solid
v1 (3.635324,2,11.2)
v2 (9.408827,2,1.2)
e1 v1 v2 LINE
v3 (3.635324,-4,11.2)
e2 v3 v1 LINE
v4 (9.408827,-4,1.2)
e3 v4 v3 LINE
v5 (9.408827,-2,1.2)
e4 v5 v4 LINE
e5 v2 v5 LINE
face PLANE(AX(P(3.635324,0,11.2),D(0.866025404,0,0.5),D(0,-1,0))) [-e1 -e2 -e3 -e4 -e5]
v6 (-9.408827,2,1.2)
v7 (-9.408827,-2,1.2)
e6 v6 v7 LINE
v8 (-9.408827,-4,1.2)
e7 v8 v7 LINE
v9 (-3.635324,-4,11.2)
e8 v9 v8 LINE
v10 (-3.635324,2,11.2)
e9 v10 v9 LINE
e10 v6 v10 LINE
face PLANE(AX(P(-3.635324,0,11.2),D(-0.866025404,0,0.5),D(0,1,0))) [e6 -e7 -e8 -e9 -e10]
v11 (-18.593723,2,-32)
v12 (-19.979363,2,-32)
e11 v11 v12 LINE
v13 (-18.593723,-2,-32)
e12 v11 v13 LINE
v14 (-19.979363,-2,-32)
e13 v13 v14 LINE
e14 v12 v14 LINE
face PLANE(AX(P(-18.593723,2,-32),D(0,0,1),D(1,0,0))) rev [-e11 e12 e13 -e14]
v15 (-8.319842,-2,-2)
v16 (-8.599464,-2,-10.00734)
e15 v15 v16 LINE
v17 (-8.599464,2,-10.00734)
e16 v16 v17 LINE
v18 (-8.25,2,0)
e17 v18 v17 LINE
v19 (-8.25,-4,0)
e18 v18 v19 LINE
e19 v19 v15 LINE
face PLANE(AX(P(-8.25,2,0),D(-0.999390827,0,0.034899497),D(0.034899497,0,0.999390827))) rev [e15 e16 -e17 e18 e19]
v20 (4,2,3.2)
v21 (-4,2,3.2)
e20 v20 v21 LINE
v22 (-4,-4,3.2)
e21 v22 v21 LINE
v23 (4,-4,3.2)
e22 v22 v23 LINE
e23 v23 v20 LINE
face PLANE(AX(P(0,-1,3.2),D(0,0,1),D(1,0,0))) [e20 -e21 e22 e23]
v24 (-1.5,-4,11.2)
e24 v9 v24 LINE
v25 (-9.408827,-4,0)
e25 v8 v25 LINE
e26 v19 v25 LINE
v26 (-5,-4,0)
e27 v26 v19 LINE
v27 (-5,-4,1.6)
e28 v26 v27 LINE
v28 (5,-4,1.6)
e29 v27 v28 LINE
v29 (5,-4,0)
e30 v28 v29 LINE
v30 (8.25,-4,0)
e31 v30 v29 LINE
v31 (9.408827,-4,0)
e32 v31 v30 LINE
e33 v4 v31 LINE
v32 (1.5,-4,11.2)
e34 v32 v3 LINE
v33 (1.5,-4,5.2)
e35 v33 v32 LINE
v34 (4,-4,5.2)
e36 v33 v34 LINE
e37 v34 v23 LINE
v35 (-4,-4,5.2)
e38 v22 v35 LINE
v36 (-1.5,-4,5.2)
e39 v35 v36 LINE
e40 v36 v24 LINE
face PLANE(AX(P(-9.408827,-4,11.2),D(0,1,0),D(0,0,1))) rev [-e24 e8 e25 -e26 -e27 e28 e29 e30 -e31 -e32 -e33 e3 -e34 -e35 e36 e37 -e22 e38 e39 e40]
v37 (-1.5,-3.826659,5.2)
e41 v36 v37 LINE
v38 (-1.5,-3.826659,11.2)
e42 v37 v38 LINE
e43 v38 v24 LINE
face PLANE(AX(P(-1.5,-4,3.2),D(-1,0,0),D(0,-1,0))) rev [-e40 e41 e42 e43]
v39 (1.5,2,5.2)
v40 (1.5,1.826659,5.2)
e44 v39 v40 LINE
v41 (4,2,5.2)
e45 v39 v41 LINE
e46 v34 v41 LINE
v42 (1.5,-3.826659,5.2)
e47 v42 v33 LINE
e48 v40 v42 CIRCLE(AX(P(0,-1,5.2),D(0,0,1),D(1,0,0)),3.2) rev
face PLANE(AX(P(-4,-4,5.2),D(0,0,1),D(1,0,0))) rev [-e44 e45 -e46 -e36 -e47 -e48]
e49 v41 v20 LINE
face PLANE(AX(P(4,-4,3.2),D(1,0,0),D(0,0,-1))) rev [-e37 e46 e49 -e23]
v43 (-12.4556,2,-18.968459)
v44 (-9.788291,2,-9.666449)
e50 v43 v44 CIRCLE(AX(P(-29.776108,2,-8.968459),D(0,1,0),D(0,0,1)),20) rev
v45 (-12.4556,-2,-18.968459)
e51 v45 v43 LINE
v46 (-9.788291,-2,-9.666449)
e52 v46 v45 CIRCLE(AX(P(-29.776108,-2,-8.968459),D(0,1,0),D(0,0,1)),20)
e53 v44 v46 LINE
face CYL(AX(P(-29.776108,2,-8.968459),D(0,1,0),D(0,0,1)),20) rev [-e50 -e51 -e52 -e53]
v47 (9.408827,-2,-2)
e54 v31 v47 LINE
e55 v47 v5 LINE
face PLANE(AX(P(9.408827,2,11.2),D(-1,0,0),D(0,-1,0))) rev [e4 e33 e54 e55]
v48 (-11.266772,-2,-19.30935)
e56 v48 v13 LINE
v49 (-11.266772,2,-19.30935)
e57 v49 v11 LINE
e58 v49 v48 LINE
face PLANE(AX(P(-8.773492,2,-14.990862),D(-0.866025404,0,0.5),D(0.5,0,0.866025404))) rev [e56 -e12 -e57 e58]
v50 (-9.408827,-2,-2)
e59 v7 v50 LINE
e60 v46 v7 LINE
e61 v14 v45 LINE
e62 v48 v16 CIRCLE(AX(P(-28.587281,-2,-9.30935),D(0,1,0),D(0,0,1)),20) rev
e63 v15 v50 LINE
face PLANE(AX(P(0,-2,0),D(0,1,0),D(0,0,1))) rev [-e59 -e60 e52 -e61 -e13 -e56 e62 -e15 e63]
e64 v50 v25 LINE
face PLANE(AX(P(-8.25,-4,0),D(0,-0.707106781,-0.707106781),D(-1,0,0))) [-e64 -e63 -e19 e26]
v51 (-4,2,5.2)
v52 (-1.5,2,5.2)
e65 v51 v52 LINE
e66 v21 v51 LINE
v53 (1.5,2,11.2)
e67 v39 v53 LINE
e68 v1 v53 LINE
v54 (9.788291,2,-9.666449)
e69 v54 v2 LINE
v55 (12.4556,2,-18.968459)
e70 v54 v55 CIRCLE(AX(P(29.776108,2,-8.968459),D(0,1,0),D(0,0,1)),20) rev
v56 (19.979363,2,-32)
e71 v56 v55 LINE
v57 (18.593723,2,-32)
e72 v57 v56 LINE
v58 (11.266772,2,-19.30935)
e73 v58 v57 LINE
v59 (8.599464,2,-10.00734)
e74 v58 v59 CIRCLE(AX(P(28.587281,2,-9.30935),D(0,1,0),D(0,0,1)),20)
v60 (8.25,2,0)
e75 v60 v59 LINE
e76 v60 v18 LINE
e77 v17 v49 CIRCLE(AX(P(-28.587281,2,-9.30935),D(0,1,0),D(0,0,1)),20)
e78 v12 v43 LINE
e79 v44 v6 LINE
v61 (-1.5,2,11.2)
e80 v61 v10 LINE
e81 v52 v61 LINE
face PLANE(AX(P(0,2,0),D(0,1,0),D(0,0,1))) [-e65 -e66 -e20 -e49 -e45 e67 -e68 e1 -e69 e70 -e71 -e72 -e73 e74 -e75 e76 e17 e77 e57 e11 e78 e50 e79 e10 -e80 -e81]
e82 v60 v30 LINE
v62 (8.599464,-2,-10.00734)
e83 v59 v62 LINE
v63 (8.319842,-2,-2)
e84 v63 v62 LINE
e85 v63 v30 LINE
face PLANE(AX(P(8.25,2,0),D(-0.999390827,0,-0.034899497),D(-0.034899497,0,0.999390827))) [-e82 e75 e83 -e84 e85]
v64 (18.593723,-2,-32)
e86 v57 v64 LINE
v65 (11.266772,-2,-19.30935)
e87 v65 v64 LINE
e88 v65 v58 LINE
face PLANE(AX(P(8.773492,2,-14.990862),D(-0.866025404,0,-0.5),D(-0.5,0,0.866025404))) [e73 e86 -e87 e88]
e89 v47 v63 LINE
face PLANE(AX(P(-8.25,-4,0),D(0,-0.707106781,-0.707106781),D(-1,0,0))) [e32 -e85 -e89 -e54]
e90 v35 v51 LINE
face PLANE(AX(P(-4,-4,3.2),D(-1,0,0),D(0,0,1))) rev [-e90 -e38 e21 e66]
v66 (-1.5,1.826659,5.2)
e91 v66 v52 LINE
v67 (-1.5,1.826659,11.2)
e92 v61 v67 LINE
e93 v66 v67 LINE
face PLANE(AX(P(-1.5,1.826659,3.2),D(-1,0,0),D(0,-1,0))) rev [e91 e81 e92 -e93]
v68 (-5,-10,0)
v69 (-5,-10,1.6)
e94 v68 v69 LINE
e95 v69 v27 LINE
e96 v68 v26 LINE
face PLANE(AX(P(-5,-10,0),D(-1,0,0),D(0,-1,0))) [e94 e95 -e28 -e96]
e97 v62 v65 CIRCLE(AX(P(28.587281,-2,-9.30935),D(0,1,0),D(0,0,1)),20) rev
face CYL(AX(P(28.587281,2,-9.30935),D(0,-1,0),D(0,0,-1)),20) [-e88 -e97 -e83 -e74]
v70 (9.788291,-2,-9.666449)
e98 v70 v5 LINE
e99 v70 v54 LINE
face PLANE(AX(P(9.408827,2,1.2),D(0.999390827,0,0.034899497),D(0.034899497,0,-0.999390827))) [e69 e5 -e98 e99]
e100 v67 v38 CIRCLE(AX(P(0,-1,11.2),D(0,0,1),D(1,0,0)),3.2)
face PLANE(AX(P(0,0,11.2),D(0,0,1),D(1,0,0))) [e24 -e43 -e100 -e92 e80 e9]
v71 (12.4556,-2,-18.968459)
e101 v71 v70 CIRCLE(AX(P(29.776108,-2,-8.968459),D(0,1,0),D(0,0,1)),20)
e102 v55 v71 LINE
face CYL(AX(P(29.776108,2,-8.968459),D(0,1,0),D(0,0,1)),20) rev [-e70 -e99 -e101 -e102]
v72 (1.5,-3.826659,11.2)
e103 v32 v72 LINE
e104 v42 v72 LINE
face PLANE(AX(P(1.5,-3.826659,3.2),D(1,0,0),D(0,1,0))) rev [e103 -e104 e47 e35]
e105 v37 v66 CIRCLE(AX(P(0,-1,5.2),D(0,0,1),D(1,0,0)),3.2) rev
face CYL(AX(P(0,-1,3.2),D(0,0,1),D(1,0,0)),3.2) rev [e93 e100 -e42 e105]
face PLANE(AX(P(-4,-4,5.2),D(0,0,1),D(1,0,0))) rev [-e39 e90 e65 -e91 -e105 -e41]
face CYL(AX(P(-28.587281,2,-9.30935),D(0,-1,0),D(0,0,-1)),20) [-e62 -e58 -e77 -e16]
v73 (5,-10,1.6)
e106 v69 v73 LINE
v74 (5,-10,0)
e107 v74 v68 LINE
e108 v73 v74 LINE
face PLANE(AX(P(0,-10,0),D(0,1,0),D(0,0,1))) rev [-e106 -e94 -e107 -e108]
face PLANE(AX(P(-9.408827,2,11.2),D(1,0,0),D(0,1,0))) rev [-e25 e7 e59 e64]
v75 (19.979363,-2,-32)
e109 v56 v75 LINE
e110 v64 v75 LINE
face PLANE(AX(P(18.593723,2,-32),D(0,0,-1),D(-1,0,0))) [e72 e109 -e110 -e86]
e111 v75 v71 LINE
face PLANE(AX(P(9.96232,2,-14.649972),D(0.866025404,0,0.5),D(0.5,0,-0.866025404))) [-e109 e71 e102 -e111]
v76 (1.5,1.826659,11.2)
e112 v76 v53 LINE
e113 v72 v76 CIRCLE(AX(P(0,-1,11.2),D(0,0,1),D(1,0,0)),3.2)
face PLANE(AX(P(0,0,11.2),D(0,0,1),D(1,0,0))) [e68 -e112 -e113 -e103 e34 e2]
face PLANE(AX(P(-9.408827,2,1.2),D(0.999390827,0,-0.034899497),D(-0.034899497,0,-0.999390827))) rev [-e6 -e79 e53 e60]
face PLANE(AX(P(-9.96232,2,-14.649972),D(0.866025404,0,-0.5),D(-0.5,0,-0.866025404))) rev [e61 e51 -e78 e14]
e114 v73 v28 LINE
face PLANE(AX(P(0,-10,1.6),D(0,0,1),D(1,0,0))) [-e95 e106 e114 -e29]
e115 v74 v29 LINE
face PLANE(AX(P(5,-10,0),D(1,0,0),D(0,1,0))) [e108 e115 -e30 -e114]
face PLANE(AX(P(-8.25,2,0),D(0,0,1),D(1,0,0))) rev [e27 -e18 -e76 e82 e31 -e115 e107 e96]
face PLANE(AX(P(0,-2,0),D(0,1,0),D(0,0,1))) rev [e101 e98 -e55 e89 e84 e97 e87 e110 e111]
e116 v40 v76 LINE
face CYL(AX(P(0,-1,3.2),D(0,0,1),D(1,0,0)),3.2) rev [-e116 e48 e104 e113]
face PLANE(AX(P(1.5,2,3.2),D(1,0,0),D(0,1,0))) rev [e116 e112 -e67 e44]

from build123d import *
from OCP.BRepFilletAPI import BRepFilletAPI_MakeChamfer

# Parameters (mm, degrees)
BOSS_EXTRUDE1_DEPTH             = 2
BOSS_EXTRUDE2_REACH             = 40.8
SKETCH2_W                       = 18.81765306
SKETCH2_H                       = 6
BOSS_EXTRUDE2_DIRECTION_2_DEPTH = 10
CUT_EXTRUDE1_DEPTH              = 8
CUT_EXTRUDE2_DEPTH              = 38.936459462
CUT_EXTRUDE2_DEPTH_BACK         = 38.936459462
SKETCH4_W                       = 8
SKETCH4_H                       = 2
CHAMFER1_SIZE                   = 2
CHAMFER2_SIZE                   = 10
CHAMFER2_SIZE2                  = 5.773502692
FILLET1_R                       = 20
BOSS_EXTRUDE3_START             = -6
SKETCH5_W                       = 10
SKETCH5_H                       = 1.6
BOSS_EXTRUDE3_DEPTH             = 12


with BuildPart() as part:
    # Sketch1 → Boss-Extrude1 (new, symmetric)
    with BuildSketch(Plane(origin=(0, 0, 0), x_dir=(1, 0, 0), z_dir=(0, 1, 0))):
        Polygon((-8.25, 0), (0, 0), (0, -1.2), (-9.40882653, -1.2), (-9.962319737, 14.649971666), (-19.979363266, 32), (-18.59372262, 32), (-8.773492451, 14.990862405), align=None)
    boss_extrude1 = extrude(amount=BOSS_EXTRUDE1_DEPTH, both=True)

    # Mirror1: Boss-Extrude1 across plane
    add(boss_extrude1.mirror(Plane(origin=(0, 2, 0), x_dir=(0, 0, 1), z_dir=(-1, 0, 0))))

    # Boss-Extrude2: up to this face of the body (flat: up to its plane)
    boss_extrude2_end = Plane(part.part.faces().sort_by_distance((0, 0, 0))[0])
    # Sketch2 → Boss-Extrude2 (add, up to the picked face)
    with BuildSketch(Plane.XY.offset(1.2), mode=Mode.PRIVATE) as boss_extrude2_sk1:
        with Locations((0, -1)):
            Rectangle(SKETCH2_W, SKETCH2_H)
    boss_extrude2_tool1 = split(extrude(boss_extrude2_sk1.sketch, amount=-BOSS_EXTRUDE2_REACH, mode=Mode.PRIVATE), bisect_by=boss_extrude2_end, keep=Keep.BOTH, mode=Mode.PRIVATE)
    add(boss_extrude2_tool1.solids().sort_by(Axis((0, -1, 1.2), (0, 0, -1)))[0])

    # Sketch2 → Boss-Extrude2 direction 2 (add)
    with BuildSketch(Plane.XY.offset(1.2)):
        with Locations((0, -1)):
            Rectangle(SKETCH2_W, SKETCH2_H)
    extrude(amount=BOSS_EXTRUDE2_DIRECTION_2_DEPTH)

    # Sketch3 → Cut-Extrude1 (cut)
    with BuildSketch(Plane.XY.offset(11.2)):
        with BuildLine():
            Line((-1.5, 1.826658805), (-1.5, 2))
            Line((-1.5, 2), (1.5, 2))
            Line((1.5, 2), (1.5, 1.826658805))
            ThreePointArc((1.5, 1.826658805), (3.2, -1), (1.5, -3.826658805))
            Line((1.5, -3.826658805), (1.5, -4))
            Line((1.5, -4), (-1.5, -4))
            Line((-1.5, -4), (-1.5, -3.826658805))
            ThreePointArc((-1.5, -3.826658805), (-3.2, -1), (-1.5, 1.826658805))
        make_face()
    extrude(amount=-CUT_EXTRUDE1_DEPTH, mode=Mode.SUBTRACT)

    # Sketch4 → Cut-Extrude2 (cut, two sides: drawn at the far end of the back side and taken through both)
    with BuildSketch(Plane(origin=(0, 0, 0), x_dir=(1, 0, 0), z_dir=(0, 1, 0)).offset(-CUT_EXTRUDE2_DEPTH_BACK)):
        with Locations((0, -4.2)):
            Rectangle(SKETCH4_W, SKETCH4_H)
    extrude(amount=CUT_EXTRUDE2_DEPTH + CUT_EXTRUDE2_DEPTH_BACK, mode=Mode.SUBTRACT)

    # Chamfer1
    chamfer1_edges = [part.edges().sort_by_distance(p)[0] for p in [
        (8.829413265, -2, 0),
        (-8.829413265, -2, 0),
    ]]
    chamfer(chamfer1_edges, length=CHAMFER1_SIZE - 0.0001)  # a hair under: the kernel refuses the full size

    # Chamfer2: one chamfer whose edges measure the first distance from different faces: ONE call of the kernel's chamfer builder (chamfer() names one face for all edges)
    chamfer2_edges_1 = [part.edges().sort_by_distance(p)[0] for p in [
        (9.40882653, -1, 11.2),
    ]]
    chamfer2_side_1 = [part.faces().sort_by_distance(p)[0] for p in [
        (9.40882653, -1.126288177, 5.77807488),
    ]]
    chamfer2_edges_2 = [part.edges().sort_by_distance(p)[0] for p in [
        (-9.40882653, -1, 11.2),
    ]]
    chamfer2_side_2 = [part.faces().sort_by_distance(p)[0] for p in [
        (-9.40882653, -1.126288177, 5.77807488),
    ]]
    chamfer2 = BRepFilletAPI_MakeChamfer(part.part.solid().wrapped)
    for e in chamfer2_edges_1:
        chamfer2.Add(CHAMFER2_SIZE, CHAMFER2_SIZE2, e.wrapped, chamfer2_side_1[0].wrapped)  # the first distance lies on this face
    for e in chamfer2_edges_2:
        chamfer2.Add(CHAMFER2_SIZE, CHAMFER2_SIZE2, e.wrapped, chamfer2_side_2[0].wrapped)  # the first distance lies on this face
    add(Compound.cast(chamfer2.Shape()), mode=Mode.REPLACE)

    # Fillet1
    fillet1_edges = [part.edges().sort_by_distance(p)[0] for p in [
        (-9.962319737, 0, -14.649971666),
        (-8.773492451, 0, -14.990862405),
        (8.773492451, 0, -14.990862405),
        (9.962319737, 0, -14.649971666),
    ]]
    fillet(fillet1_edges, radius=FILLET1_R)

    # Sketch5 → Boss-Extrude3 (add)
    with BuildSketch(Plane.XZ.offset(4).offset(BOSS_EXTRUDE3_START)):
        with Locations((0, 0.8)):
            Rectangle(SKETCH5_W, SKETCH5_H)
    extrude(amount=BOSS_EXTRUDE3_DEPTH)


solid = part.part
